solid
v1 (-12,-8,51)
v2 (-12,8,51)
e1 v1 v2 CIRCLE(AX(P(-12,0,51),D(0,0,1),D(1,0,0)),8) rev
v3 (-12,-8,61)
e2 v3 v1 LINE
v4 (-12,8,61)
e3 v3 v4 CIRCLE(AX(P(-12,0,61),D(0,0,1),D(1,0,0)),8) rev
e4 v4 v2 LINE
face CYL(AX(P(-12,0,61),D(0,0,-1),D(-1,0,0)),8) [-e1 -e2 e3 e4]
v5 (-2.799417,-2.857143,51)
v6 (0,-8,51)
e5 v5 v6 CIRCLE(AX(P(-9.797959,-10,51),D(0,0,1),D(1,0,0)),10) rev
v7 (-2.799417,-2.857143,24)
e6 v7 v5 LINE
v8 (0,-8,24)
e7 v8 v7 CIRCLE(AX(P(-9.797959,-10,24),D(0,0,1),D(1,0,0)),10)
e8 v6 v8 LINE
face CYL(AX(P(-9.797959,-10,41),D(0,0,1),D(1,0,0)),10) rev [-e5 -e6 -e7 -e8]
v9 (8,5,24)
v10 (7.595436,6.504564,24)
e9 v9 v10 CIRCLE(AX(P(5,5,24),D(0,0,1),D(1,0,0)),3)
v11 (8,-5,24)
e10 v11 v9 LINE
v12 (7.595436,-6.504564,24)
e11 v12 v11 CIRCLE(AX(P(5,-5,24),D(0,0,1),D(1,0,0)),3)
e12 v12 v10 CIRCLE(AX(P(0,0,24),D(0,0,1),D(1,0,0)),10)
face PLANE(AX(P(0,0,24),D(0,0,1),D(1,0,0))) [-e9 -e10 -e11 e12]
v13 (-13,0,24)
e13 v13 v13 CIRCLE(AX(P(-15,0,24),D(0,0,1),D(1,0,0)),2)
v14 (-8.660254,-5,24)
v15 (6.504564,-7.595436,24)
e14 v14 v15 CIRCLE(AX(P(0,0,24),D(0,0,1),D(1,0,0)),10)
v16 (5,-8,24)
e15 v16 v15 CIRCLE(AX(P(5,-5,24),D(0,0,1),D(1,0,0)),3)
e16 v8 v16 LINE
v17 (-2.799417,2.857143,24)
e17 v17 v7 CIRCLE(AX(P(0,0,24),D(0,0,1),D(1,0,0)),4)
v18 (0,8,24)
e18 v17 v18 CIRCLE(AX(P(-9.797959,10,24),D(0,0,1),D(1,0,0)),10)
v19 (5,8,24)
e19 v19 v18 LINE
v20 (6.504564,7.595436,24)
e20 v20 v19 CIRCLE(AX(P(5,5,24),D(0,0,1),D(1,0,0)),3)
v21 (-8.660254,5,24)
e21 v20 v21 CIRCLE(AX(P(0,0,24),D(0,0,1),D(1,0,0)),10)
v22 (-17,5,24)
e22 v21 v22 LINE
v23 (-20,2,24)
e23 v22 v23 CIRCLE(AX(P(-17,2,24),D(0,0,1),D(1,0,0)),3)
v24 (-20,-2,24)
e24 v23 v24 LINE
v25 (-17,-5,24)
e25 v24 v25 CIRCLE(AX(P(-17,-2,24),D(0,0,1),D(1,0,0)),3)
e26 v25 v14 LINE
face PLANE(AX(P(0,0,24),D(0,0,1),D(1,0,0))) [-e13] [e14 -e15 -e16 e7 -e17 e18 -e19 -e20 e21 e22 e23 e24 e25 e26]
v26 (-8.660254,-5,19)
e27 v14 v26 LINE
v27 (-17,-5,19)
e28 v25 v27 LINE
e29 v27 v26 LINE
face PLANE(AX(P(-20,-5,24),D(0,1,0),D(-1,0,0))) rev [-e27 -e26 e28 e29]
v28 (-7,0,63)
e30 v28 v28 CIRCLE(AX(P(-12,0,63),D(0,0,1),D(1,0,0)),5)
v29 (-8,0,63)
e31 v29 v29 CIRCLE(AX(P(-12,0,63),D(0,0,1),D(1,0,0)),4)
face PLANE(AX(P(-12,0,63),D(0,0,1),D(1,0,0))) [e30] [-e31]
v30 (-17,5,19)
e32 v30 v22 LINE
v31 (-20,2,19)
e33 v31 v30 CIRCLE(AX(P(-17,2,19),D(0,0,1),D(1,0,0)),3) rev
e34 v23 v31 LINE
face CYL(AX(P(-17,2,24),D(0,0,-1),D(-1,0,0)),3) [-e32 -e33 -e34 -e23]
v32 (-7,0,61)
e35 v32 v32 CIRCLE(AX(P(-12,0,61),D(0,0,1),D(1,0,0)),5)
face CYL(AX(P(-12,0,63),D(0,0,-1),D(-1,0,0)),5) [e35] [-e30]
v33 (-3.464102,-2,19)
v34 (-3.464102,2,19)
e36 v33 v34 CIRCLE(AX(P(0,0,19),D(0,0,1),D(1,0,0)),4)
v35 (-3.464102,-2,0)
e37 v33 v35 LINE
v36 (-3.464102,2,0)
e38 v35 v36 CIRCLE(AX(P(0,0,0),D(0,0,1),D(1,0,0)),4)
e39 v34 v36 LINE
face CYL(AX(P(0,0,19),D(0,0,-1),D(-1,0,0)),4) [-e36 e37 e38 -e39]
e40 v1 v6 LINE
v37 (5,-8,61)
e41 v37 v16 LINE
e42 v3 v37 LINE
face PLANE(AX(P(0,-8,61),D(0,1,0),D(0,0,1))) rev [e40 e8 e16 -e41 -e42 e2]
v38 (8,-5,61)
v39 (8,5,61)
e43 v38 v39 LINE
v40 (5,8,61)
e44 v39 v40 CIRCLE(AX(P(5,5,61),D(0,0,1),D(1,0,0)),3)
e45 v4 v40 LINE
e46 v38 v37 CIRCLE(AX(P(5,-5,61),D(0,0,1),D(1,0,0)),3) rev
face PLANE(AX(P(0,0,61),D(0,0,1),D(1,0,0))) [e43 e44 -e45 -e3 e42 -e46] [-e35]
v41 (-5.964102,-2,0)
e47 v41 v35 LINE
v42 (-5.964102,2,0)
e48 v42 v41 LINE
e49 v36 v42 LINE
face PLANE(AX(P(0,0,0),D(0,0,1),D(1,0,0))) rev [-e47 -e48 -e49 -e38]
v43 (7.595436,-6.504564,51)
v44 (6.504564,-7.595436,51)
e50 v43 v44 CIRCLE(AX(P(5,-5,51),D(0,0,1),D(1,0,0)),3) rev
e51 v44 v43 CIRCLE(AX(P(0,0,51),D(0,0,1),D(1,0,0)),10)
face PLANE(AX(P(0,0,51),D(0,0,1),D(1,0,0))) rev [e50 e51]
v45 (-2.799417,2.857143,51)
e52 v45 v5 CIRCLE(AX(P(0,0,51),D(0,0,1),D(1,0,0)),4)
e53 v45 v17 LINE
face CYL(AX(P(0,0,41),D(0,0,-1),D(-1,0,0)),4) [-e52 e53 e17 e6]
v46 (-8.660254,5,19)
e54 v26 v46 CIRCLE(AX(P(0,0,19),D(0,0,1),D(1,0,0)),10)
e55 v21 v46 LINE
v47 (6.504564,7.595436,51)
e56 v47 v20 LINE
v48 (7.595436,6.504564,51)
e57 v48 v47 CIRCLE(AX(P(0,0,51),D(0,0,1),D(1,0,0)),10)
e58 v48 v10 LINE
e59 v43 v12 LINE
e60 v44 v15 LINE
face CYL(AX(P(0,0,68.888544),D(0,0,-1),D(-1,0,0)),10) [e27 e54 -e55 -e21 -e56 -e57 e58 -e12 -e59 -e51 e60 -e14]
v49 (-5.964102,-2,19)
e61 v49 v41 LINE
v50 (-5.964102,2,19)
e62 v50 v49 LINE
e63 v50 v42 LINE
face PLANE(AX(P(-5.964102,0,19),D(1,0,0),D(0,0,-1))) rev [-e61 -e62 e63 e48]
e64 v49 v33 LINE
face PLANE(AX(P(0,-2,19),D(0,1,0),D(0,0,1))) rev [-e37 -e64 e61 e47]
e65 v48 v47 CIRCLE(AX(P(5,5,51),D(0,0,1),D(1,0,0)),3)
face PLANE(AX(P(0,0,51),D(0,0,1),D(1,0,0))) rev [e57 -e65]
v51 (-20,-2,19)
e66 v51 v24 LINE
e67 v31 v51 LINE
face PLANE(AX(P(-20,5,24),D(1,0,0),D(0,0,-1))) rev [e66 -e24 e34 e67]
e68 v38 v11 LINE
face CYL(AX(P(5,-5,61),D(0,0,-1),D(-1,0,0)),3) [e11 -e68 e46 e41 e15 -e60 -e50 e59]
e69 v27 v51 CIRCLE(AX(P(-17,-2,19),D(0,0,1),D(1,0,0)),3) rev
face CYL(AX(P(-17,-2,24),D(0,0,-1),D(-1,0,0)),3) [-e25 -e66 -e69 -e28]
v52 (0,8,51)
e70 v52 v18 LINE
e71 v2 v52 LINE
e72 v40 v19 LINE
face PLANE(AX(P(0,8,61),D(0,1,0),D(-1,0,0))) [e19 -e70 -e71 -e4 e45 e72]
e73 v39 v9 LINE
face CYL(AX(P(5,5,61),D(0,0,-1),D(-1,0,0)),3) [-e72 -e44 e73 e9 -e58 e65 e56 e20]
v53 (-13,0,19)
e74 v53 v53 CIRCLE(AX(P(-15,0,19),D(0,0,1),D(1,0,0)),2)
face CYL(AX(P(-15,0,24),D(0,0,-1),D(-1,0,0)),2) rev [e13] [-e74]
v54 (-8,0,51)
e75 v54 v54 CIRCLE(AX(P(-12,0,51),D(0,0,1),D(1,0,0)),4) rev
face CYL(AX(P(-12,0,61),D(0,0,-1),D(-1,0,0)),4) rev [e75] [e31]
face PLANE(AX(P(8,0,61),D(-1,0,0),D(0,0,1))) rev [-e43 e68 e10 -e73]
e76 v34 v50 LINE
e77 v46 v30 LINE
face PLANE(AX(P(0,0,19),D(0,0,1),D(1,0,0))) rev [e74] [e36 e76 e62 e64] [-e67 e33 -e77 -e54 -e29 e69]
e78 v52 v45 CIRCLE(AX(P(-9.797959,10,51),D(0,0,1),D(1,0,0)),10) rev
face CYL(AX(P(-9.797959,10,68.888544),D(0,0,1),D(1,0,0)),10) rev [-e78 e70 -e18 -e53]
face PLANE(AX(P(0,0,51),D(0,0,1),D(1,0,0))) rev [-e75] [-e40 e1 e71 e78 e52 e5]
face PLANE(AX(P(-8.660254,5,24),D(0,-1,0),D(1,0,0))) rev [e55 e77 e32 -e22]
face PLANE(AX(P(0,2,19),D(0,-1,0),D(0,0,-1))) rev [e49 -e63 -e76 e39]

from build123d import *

# Parameters (mm, degrees)
RESSALTO_EXTRUS_O2_DEPTH  = 19
ESBO_O2_R                 = 2
RESSALTO_EXTRUS_O3_DEPTH  = 5
FILETE1_R                 = 3
ESBO_O3_R                 = 4
RESSALTO_EXTRUS_O4_DEPTH  = 17
RESSALTO_EXTRUS_O6_START  = 10
ESBO_O4_R                 = 4
RESSALTO_EXTRUS_O6_DEPTH  = 10
ESBO_O5_R                 = 4
RESSALTO_EXTRUS_O7_DEPTH  = 10
RESSALTO_EXTRUS_O10_DEPTH = 27
FILETE2_R                 = 10
ESBO_O8_R                 = 5
ESBO_O8_R_2               = 4
RESSALTO_EXTRUS_O11_DEPTH = 2


with BuildPart() as part:
    # Esboço1 → Ressalto-extrusão2 (new body)
    with BuildSketch(Plane.XY):
        with BuildLine():
            Line((-5.964101615, -2), (-3.464101615, -2))
            ThreePointArc((-3.464101615, -2), (4, 0), (-3.464101615, 2))
            Line((-3.464101615, 2), (-5.964101615, 2))
            Line((-5.964101615, 2), (-5.964101615, -2))
        make_face()
    extrude(amount=RESSALTO_EXTRUS_O2_DEPTH)

    # Esboço2 → Ressalto-extrusão3 (add)
    with BuildSketch(Plane.XY.offset(19)):
        with BuildLine():
            Line((-20, -5), (-8.660254038, -5))
            ThreePointArc((-8.660254038, -5), (10, 0), (-8.660254038, 5))
            Line((-8.660254038, 5), (-20, 5))
            Line((-20, 5), (-20, -5))
        make_face()
        with Locations((-15, 0)):
            Circle(ESBO_O2_R, mode=Mode.SUBTRACT)
    extrude(amount=RESSALTO_EXTRUS_O3_DEPTH)

    # Filete1
    filete1_edges = [part.edges().sort_by_distance(p)[0] for p in [
        (-20, 5, 21.5),
        (-20, -5, 21.5),
    ]]
    fillet(filete1_edges, radius=FILETE1_R)

    # Esboço3 → Ressalto-extrusão4 (add)
    with BuildSketch(Plane.XY.offset(24)):
        Circle(ESBO_O3_R)
    extrude(amount=RESSALTO_EXTRUS_O4_DEPTH)

    # Esboço5 → Ressalto-extrusão7 (add)
    with BuildSketch(Plane.XY.offset(41)):
        Circle(ESBO_O5_R)
    extrude(amount=RESSALTO_EXTRUS_O7_DEPTH)



with BuildPart() as body_2:
    # Esboço4 → Ressalto-extrusão6 (new body)
    with BuildSketch(Plane.XY.offset(41).offset(RESSALTO_EXTRUS_O6_START)):
        with BuildLine():
            Line((4, -8), (5, -8))
            ThreePointArc((5, -8), (7.121320344, -7.121320344), (8, -5))
            Line((8, -5), (8, 5))
            ThreePointArc((8, 5), (7.121320344, 7.121320344), (5, 8))
            Line((5, 8), (4, 8))
            Line((4, 8), (-4, 8))
            Line((-4, 8), (-12, 8))
            ThreePointArc((-12, 8), (-20, 0), (-12, -8))
            Line((-12, -8), (-4, -8))
            Line((-4, -8), (4, -8))
        make_face()
        with Locations((-12, 0)):
            Circle(ESBO_O4_R, mode=Mode.SUBTRACT)
    extrude(amount=RESSALTO_EXTRUS_O6_DEPTH)


with BuildPart() as part_1:
    add(part.part)

    add(body_2.part)  # Ressalto-extrusão10 merges body 2
    # Esboço7 → Ressalto-extrusão10 (add)
    with BuildSketch(Plane.XY.offset(24)):
        with BuildLine():
            Line((0, 8), (0, 4))
            ThreePointArc((0, 4), (2.828427125, 2.828427125), (4, 0))
            ThreePointArc((4, 0), (2.828427125, -2.828427125), (0, -4))
            Line((0, -4), (0, -8))
            Line((0, -8), (5, -8))
            ThreePointArc((5, -8), (5.779003589, -7.897093959), (6.504564394, -7.595435606))
            ThreePointArc((6.504564394, -7.595435606), (7.071067812, -7.071067812), (7.595435606, -6.504564394))
            ThreePointArc((7.595435606, -6.504564394), (7.897093959, -5.779003589), (8, -5))
            Line((8, -5), (8, 5))
            ThreePointArc((8, 5), (7.897093959, 5.779003589), (7.595435606, 6.504564394))
            ThreePointArc((7.595435606, 6.504564394), (7.071067812, 7.071067812), (6.504564394, 7.595435606))
            ThreePointArc((6.504564394, 7.595435606), (5.779003589, 7.897093959), (5, 8))
            Line((5, 8), (0, 8))
        make_face()
    extrude(amount=RESSALTO_EXTRUS_O10_DEPTH)

    # Filete2
    # the kernel refuses this fillet: 10 mm, written as the material it adds along each edge
    with BuildSketch(Plane(origin=(0, -4, 14), x_dir=(0, -1, 0), z_dir=(0, 0, 1))) as filete2_piece_1_section:
        with BuildLine():
            CenterArc((6, -9.797958971), FILETE2_R, 101.536959033, 34.04773237)
            ThreePointArc((-1.142857143, -2.799416849), (-0.296719601, -1.511857892), (0, 0))
            Line((0, 0), (4, 0))
        make_face()
    filete2_piece_1 = extrude(amount=47, mode=Mode.PRIVATE)
    filete2_piece_1 = split(filete2_piece_1, bisect_by=Plane(origin=(-0.997292113, -5.209523734, 19), z_dir=(0, 0, 1)), keep=Keep.TOP, mode=Mode.PRIVATE)
    add(filete2_piece_1)
    with BuildSketch(Plane(origin=(0, 4, 14), x_dir=(-0.9258200997725515, -0.3779644730092269, 0), z_dir=(0, 0, 1))) as filete2_piece_2_section:
        with BuildLine():
            CenterArc((6.803360514, -9.258200998), FILETE2_R, 112.207654299, 34.04773237)
            Line((-1.511857892, -3.703280399), (0, 0))
            ThreePointArc((0, 0), (1.511857892, -0.296719601), (3.023715784, 0))
        make_face()
    filete2_piece_2 = extrude(amount=47, mode=Mode.PRIVATE)
    filete2_piece_2 = split(filete2_piece_2, bisect_by=Plane(origin=(-0.997292113, 5.209523734, 19), z_dir=(0, 0, 1)), keep=Keep.TOP, mode=Mode.PRIVATE)
    add(filete2_piece_2)

    # Esboço8 → Ressalto-extrusão11 (add)
    with BuildSketch(Plane.XY.offset(61)):
        with Locations((-12, 0)):
            Circle(ESBO_O8_R)
        with Locations((-12, 0)):
            Circle(ESBO_O8_R_2, mode=Mode.SUBTRACT)
    extrude(amount=RESSALTO_EXTRUS_O11_DEPTH)


solid = part_1.part
